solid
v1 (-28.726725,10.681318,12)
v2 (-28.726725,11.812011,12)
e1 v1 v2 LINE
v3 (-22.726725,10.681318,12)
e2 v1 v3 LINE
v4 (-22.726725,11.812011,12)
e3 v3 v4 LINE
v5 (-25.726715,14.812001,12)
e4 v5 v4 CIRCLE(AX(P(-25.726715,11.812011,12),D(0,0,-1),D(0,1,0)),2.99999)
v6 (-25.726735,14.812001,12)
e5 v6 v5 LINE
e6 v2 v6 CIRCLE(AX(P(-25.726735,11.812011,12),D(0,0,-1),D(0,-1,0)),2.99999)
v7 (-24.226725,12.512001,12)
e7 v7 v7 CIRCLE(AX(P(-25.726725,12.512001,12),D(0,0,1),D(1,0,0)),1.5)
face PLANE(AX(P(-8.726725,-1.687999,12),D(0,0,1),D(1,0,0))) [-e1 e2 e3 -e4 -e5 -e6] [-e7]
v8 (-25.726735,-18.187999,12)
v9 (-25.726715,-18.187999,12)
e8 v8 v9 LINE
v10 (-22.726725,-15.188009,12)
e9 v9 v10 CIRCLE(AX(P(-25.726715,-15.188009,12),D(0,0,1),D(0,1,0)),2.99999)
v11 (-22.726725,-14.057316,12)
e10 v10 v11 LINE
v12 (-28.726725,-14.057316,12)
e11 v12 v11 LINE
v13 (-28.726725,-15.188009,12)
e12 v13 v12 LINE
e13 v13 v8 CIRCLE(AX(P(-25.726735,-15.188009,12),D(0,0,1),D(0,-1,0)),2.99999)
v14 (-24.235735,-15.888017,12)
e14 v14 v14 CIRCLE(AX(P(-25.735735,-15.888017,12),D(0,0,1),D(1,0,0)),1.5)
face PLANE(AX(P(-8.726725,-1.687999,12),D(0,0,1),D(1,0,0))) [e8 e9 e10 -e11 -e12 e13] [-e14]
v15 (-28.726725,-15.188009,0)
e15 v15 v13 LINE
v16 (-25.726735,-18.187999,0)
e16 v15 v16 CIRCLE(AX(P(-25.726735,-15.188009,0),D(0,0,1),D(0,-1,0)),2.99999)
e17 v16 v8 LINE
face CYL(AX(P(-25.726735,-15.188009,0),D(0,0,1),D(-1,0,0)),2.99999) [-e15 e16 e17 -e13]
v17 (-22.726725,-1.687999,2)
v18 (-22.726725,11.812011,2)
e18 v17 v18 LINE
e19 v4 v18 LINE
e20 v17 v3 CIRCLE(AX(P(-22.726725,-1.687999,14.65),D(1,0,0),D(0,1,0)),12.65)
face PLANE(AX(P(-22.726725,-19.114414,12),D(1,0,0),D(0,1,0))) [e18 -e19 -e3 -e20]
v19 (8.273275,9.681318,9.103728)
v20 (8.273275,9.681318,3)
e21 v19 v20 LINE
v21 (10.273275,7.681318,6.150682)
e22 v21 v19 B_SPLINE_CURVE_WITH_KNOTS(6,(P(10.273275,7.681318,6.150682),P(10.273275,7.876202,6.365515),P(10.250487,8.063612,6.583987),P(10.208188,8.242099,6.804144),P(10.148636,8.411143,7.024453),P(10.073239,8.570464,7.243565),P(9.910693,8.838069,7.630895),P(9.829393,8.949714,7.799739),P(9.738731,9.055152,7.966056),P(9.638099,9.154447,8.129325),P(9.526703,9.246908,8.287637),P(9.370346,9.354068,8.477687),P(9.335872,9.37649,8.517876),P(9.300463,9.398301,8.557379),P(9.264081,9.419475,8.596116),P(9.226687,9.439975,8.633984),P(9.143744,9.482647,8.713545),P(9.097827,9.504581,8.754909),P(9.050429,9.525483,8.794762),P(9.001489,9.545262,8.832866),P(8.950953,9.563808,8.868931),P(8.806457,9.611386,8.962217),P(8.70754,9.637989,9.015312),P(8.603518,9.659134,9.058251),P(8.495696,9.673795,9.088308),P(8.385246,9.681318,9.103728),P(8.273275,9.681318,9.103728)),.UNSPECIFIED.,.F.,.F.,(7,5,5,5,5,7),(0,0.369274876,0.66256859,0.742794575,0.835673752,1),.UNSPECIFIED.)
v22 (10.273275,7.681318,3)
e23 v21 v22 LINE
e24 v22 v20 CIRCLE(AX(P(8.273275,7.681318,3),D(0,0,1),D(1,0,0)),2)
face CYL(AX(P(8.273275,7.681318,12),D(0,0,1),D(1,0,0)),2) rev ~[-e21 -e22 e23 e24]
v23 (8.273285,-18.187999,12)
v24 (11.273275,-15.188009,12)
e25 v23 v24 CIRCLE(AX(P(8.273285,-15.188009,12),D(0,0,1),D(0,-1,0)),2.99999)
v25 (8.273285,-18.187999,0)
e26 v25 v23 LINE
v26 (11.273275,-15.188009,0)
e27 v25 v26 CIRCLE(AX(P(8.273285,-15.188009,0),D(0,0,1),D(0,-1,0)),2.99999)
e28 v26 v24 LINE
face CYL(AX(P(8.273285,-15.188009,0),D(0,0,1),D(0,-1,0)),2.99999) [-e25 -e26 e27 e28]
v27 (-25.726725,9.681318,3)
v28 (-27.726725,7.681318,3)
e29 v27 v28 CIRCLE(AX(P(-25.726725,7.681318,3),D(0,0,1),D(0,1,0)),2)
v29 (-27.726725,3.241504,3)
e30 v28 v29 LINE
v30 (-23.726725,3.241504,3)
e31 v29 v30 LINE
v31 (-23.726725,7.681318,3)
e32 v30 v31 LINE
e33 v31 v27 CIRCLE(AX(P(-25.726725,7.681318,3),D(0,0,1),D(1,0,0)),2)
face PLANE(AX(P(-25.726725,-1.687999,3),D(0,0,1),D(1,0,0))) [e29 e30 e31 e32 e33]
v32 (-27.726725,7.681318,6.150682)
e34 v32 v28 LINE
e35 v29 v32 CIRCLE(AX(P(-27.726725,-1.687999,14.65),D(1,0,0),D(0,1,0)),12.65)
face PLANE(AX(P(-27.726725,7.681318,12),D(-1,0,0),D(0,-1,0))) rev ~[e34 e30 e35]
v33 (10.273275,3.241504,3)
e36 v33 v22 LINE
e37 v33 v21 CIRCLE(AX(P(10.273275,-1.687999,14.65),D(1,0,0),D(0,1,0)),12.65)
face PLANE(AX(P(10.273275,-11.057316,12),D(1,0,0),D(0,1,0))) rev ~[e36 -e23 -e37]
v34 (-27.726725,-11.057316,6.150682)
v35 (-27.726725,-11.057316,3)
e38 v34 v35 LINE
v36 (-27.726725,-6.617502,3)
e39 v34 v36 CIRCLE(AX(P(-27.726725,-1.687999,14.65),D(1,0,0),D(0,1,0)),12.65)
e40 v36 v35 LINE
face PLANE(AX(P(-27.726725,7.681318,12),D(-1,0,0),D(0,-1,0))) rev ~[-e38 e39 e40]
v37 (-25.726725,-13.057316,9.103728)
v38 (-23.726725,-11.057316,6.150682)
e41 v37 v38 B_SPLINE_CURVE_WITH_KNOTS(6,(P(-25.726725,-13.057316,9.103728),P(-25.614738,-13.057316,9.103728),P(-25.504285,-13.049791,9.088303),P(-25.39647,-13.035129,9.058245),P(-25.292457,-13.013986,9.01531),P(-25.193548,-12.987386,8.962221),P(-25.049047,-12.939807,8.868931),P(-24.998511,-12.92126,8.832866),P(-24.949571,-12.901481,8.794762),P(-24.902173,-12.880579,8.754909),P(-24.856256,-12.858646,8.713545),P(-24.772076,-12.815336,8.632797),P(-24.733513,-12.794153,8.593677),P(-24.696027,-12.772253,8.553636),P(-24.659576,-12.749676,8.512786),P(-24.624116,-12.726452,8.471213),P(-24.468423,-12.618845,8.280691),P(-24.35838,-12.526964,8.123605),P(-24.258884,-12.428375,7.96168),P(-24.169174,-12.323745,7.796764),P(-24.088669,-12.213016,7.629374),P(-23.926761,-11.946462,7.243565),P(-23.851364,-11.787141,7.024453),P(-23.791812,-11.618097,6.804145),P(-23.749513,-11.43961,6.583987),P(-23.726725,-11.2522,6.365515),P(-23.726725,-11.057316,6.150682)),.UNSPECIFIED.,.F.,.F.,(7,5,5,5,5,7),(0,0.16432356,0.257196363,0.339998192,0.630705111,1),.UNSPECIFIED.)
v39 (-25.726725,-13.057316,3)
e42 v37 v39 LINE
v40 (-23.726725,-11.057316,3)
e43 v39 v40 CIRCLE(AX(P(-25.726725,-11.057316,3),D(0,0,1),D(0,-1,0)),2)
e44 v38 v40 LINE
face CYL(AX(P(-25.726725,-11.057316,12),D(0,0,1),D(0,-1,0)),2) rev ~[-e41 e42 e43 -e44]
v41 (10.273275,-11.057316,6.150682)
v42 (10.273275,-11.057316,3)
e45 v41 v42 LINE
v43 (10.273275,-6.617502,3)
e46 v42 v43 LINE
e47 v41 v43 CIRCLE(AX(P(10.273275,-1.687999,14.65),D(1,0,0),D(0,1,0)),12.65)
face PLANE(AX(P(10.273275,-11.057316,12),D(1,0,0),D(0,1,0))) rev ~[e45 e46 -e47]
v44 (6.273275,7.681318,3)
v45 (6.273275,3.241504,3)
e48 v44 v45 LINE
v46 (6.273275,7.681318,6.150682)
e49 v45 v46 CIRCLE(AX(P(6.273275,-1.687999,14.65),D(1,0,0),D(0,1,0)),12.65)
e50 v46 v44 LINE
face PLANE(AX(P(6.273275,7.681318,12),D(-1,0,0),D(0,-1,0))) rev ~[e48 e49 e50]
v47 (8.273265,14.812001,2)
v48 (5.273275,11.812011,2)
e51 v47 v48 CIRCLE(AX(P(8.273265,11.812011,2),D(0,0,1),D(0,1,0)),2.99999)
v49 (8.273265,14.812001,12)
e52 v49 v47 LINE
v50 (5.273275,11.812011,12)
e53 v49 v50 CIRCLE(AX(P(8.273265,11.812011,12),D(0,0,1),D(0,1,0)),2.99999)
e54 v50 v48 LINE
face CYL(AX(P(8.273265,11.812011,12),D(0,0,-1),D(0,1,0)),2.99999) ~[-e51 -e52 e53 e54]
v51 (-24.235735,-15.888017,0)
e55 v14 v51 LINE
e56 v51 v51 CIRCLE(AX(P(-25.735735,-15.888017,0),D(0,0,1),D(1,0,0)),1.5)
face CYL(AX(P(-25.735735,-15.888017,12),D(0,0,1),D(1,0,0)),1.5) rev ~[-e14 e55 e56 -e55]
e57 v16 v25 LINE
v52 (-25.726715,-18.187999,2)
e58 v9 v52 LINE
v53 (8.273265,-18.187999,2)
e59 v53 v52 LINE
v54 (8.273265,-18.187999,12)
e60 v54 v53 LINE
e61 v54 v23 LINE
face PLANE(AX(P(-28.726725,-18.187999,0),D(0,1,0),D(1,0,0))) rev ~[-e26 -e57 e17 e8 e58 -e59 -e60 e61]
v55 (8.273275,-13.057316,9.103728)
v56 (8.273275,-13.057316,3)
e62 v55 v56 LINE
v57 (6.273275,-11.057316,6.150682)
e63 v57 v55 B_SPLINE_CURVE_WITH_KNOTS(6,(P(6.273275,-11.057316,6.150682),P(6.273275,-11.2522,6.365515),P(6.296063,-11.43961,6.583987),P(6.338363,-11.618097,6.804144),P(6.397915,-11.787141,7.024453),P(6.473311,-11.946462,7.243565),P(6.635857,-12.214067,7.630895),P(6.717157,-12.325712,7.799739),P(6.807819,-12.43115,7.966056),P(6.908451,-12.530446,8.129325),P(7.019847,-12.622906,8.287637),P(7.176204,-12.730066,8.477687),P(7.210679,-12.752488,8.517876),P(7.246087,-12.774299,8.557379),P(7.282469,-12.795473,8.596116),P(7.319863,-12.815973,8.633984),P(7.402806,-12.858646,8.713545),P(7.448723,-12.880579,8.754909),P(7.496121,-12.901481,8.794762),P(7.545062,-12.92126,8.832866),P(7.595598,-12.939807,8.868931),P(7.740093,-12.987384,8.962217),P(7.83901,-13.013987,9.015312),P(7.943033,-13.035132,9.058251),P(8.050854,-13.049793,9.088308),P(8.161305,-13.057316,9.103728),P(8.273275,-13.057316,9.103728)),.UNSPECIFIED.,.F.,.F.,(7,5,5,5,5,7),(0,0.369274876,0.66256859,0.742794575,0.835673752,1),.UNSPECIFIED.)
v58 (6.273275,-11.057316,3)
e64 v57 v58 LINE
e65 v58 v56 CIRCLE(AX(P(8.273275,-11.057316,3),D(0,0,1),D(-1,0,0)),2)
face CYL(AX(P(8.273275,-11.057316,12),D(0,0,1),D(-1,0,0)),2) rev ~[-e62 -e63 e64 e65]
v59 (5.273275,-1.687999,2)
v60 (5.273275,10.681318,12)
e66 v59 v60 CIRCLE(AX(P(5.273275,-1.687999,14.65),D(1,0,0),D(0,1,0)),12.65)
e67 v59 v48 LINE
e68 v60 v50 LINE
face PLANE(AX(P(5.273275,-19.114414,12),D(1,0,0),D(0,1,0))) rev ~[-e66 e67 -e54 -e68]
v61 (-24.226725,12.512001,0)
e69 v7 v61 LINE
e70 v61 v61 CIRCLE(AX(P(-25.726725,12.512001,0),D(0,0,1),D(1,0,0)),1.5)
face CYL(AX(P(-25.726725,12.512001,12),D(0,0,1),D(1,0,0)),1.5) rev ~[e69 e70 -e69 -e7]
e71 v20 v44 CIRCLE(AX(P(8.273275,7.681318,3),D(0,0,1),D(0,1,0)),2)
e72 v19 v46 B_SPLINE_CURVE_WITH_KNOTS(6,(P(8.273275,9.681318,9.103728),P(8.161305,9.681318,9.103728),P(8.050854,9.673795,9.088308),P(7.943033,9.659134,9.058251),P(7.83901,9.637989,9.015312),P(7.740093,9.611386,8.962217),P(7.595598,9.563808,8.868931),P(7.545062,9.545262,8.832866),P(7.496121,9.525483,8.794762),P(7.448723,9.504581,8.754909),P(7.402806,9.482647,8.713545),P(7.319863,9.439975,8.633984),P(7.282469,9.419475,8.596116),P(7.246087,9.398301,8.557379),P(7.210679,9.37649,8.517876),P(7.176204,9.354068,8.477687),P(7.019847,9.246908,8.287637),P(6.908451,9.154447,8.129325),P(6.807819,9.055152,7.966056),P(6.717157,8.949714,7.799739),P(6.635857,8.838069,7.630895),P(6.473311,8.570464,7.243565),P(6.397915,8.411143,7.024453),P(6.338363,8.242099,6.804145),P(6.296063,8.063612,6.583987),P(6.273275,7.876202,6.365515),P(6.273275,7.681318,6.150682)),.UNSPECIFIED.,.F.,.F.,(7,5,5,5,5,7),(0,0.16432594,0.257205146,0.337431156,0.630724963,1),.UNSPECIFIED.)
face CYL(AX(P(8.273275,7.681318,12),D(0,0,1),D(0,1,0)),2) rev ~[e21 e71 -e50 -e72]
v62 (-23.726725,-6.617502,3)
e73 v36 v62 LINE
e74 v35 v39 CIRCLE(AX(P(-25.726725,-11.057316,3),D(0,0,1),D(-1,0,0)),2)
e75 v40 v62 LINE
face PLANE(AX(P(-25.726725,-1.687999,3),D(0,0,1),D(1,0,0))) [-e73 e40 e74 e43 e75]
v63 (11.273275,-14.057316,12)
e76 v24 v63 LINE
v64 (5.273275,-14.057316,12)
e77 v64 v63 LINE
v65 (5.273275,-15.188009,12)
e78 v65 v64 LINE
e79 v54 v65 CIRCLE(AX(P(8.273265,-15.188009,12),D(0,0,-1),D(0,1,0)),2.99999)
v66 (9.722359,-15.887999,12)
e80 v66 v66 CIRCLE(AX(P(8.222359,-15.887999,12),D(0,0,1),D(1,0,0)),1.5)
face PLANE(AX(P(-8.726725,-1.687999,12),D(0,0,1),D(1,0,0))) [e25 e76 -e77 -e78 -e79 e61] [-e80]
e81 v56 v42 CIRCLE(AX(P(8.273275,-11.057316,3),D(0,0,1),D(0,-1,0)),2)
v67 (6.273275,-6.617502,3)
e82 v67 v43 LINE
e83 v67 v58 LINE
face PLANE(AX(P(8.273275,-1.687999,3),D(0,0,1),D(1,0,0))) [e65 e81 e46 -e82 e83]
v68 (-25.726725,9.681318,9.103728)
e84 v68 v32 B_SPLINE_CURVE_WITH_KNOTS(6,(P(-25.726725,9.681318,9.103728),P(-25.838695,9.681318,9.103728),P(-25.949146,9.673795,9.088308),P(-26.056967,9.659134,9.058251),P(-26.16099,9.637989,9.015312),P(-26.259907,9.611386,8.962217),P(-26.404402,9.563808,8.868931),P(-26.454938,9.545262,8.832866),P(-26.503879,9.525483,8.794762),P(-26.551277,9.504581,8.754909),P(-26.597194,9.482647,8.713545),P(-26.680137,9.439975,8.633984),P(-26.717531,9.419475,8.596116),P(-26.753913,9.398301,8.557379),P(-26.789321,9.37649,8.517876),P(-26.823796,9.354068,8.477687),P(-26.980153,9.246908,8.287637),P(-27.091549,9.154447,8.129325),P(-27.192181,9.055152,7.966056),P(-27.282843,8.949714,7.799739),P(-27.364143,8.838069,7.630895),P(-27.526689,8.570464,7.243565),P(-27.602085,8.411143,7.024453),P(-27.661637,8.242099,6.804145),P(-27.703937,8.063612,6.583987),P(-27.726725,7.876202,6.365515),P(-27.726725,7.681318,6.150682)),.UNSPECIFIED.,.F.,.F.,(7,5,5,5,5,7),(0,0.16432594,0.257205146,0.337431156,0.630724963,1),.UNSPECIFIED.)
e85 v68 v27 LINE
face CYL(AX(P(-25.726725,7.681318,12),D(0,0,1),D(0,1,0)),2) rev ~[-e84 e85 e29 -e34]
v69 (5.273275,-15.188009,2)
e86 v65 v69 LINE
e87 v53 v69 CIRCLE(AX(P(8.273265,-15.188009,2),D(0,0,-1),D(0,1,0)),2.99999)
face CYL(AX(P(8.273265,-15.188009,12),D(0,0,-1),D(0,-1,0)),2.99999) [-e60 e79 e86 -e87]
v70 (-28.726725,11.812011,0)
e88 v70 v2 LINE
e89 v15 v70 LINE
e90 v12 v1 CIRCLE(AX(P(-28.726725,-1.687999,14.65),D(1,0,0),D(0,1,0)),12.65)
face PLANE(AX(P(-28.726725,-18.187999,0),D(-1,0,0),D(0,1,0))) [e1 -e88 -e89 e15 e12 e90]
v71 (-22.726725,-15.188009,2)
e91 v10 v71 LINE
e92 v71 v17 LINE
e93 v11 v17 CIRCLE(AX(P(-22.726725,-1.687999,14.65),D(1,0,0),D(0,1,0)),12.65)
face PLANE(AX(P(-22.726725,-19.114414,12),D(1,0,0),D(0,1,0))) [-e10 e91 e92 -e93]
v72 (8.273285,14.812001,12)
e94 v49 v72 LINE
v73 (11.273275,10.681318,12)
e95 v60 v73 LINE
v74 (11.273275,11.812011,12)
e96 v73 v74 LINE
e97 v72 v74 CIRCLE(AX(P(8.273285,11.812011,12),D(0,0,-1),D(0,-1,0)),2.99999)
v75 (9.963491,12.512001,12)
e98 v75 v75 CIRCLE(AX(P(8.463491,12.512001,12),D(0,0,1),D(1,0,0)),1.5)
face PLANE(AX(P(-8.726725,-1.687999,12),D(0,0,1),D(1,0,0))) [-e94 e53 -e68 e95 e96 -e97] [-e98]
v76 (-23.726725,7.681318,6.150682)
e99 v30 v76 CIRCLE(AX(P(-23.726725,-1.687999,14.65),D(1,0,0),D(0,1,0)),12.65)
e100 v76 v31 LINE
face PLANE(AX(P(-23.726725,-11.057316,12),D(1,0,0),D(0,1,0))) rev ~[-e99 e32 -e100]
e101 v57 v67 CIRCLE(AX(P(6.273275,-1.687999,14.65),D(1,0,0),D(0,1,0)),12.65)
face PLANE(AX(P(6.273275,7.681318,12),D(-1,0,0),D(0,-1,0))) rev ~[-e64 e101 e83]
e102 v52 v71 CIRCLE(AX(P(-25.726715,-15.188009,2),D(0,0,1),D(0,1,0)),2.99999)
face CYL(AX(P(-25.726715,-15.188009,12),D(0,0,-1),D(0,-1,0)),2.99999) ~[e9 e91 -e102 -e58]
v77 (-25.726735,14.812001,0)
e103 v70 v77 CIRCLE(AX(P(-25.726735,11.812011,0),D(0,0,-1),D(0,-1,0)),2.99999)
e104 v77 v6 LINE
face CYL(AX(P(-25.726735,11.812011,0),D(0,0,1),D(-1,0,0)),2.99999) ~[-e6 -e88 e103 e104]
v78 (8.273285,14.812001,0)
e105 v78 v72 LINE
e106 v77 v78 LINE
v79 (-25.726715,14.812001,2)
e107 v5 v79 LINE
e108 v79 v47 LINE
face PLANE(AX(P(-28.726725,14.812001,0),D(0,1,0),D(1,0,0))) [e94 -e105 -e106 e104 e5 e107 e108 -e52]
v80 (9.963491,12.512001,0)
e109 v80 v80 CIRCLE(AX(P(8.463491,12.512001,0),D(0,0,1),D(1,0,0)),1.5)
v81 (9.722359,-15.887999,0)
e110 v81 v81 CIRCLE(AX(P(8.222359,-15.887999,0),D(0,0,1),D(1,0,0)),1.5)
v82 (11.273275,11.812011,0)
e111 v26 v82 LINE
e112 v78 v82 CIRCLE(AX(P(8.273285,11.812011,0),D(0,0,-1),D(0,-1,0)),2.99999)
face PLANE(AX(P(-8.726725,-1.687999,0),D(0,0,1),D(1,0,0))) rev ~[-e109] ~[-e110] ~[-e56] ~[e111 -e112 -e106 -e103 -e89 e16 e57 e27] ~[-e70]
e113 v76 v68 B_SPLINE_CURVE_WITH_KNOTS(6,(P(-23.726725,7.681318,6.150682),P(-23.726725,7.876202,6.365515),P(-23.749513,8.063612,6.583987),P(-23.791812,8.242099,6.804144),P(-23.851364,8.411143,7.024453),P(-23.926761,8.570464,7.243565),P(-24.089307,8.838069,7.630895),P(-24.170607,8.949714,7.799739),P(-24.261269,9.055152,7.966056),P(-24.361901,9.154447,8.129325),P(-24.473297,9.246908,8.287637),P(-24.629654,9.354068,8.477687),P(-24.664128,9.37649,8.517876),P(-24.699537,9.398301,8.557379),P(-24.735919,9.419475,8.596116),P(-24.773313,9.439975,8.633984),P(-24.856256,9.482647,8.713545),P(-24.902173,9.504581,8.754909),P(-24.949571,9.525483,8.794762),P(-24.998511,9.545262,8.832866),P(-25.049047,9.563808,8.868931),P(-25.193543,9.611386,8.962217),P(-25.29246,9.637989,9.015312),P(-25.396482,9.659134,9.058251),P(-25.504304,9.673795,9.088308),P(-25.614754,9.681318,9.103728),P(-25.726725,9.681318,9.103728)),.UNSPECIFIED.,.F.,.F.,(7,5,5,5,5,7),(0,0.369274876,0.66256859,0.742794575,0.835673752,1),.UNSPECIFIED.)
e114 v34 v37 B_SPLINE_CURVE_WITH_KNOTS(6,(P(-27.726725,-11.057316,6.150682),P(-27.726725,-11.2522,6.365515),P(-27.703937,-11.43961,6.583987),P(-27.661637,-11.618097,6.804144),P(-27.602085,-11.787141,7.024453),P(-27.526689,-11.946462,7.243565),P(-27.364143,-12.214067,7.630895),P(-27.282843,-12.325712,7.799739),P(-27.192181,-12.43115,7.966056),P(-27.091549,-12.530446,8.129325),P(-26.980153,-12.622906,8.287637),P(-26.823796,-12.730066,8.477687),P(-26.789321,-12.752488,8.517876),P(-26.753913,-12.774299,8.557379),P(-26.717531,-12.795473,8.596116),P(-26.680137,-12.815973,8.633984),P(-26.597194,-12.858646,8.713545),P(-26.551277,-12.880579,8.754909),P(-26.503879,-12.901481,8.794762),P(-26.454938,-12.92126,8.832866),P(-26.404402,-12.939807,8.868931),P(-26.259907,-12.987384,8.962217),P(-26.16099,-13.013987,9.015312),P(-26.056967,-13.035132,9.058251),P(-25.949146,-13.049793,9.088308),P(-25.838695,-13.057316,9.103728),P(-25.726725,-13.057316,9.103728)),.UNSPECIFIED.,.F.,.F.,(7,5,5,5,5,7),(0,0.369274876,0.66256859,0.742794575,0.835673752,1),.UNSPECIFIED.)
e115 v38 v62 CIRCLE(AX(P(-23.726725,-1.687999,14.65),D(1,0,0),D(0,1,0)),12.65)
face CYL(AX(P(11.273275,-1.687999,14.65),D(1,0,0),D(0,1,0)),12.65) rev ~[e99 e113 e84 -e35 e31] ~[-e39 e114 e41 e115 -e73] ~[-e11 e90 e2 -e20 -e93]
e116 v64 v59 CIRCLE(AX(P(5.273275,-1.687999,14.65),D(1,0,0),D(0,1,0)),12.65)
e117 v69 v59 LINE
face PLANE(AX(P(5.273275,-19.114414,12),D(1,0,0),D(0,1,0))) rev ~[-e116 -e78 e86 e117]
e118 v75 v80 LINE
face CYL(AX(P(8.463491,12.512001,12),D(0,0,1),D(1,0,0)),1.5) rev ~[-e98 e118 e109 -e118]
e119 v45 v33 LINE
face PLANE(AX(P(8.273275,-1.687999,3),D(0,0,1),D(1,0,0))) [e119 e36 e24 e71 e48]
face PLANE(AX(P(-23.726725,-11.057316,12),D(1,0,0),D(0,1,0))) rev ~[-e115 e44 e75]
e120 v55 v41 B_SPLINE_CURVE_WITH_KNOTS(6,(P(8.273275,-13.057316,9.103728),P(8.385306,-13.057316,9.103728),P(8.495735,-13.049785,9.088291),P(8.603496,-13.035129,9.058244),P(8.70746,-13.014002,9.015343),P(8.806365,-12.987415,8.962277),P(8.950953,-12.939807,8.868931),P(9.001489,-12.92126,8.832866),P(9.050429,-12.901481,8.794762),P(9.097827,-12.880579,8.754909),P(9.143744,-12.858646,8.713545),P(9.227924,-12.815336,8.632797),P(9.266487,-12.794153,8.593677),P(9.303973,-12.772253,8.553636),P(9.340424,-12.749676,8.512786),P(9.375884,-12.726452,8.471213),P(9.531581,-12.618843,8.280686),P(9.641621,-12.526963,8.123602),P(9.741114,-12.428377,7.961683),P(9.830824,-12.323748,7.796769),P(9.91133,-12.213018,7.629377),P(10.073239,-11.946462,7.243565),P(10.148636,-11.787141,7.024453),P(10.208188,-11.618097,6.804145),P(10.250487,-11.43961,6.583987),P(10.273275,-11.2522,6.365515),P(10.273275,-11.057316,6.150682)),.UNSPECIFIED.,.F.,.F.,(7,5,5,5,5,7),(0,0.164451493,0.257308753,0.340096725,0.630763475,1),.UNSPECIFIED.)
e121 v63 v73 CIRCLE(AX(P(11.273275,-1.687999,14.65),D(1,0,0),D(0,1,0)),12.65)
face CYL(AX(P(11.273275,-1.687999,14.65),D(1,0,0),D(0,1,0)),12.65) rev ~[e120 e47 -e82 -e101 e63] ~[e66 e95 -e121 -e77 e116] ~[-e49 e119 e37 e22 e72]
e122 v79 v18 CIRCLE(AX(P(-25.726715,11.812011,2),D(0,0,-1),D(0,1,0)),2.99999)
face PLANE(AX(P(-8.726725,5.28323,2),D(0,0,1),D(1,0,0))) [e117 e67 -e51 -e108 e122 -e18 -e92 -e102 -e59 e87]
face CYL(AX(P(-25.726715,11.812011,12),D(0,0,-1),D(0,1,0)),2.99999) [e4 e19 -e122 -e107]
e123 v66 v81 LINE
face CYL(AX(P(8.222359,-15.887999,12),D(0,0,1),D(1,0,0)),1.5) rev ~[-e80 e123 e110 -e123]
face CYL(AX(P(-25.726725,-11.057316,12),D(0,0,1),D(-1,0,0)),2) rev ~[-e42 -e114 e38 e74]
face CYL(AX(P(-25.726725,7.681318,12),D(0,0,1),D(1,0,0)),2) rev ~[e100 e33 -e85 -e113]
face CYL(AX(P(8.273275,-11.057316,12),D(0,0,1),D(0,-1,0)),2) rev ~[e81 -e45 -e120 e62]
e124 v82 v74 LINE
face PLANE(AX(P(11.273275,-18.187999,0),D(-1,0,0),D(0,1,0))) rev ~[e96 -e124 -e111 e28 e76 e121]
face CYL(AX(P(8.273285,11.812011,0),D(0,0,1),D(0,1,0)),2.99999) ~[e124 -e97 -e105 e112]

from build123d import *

# Parameters (mm, degrees)
F0_W      = 40
F0_H      = 33
F1_DEPTH  = 12
F2_R      = 12.65
F3_DEPTH  = 69
F4_W      = 28
F4_H      = 48.7952879344
F5_DEPTH  = 10
F7_DEPTH  = 9
F8_R      = 2.99999
F9_R      = 1.5
F10_DEPTH = 20


# Not quite as in the source:
# - a fillet or chamfer is up to 0.001 mm smaller than in the source, because OpenCascade refuses the exact size


with BuildPart() as f1:
    # F0 (on Top) → F1 (new body)
    with BuildSketch(Plane.XY):
        with Locations((-8.7267248217, -1.6879990697)):
            Rectangle(F0_W, F0_H)
    extrude(amount=F1_DEPTH)

    # F2 (on face) → F3 (cut)
    with BuildSketch(Plane.YZ.offset(11.2732751783)):
        with Locations((-1.6879990697, 14.65)):
            Circle(F2_R)
    extrude(amount=-F3_DEPTH, mode=Mode.SUBTRACT)

    # F4 (on face) → F5 (cut)
    with BuildSketch(Plane.XY.offset(12)):
        with Locations((-8.7267248217, 5.2832299843)):
            Rectangle(F4_W, F4_H)
    extrude(amount=-F5_DEPTH, mode=Mode.SUBTRACT)

    # F6 (on face) → F7 (cut)
    with BuildSketch(Plane.XY.offset(12)):
        with BuildLine():
            ThreePointArc((-25.7267248217, 9.6813178072), (-27.140938384, 9.0955313695), (-27.7267248217, 7.6813178072))
            Line((-27.7267248217, 7.6813178072), (-27.7267248217, -11.0573159465))
            ThreePointArc((-27.7267248217, -11.0573159465), (-27.140938384, -12.4715295089), (-25.7267248217, -13.0573159465))
            ThreePointArc((-25.7267248217, -13.0573159465), (-24.3125112593, -12.4715295089), (-23.7267248217, -11.0573159465))
            Line((-23.7267248217, -11.0573159465), (-23.7267248217, 7.6813178072))
            ThreePointArc((-23.7267248217, 7.6813178072), (-24.3125112593, 9.0955313695), (-25.7267248217, 9.6813178072))
        make_face()
        with BuildLine():
            ThreePointArc((8.2732751783, 9.6813178072), (6.859061616, 9.0955313695), (6.2732751783, 7.6813178072))
            Line((6.2732751783, 7.6813178072), (6.2732751783, -11.0573159465))
            ThreePointArc((6.2732751783, -11.0573159465), (6.859061616, -12.4715295089), (8.2732751783, -13.0573159465))
            ThreePointArc((8.2732751783, -13.0573159465), (9.6874887407, -12.4715295089), (10.2732751783, -11.0573159465))
            Line((10.2732751783, -11.0573159465), (10.2732751783, 7.6813178072))
            ThreePointArc((10.2732751783, 7.6813178072), (9.6874887407, 9.0955313695), (8.2732751783, 9.6813178072))
        make_face()
    extrude(amount=-F7_DEPTH, mode=Mode.SUBTRACT)

    # F8 (radius 3 in the source; OpenCascade refuses exactly that, so slightly less here)
    f8_edges = [f1.edges().sort_by_distance(p)[0] for p in [
        (5.273275, 14.812001, 7),
        (11.273275, 14.812001, 6),
        (-22.726725, 14.812001, 7),
        (-28.726725, 14.812001, 6),
        (-28.726725, -18.187999, 6),
        (-22.726725, -18.187999, 7),
        (5.273275, -18.187999, 7),
        (11.273275, -18.187999, 6),
    ]]
    fillet(f8_edges, radius=F8_R)

    # F9 (on face) → F10 (cut)
    with BuildSketch(Plane.XY.offset(12)):
        with Locations((-25.7267248217, 12.5120009303)):
            Circle(F9_R)
        with Locations((8.4634907544, 12.5120009303)):
            Circle(F9_R)
        with Locations((8.2223585095, -15.8879990697)):
            Circle(F9_R)
        with Locations((-25.7357346928, -15.8880167171)):
            Circle(F9_R)
    extrude(amount=-F10_DEPTH, mode=Mode.SUBTRACT)


solid = f1.part
